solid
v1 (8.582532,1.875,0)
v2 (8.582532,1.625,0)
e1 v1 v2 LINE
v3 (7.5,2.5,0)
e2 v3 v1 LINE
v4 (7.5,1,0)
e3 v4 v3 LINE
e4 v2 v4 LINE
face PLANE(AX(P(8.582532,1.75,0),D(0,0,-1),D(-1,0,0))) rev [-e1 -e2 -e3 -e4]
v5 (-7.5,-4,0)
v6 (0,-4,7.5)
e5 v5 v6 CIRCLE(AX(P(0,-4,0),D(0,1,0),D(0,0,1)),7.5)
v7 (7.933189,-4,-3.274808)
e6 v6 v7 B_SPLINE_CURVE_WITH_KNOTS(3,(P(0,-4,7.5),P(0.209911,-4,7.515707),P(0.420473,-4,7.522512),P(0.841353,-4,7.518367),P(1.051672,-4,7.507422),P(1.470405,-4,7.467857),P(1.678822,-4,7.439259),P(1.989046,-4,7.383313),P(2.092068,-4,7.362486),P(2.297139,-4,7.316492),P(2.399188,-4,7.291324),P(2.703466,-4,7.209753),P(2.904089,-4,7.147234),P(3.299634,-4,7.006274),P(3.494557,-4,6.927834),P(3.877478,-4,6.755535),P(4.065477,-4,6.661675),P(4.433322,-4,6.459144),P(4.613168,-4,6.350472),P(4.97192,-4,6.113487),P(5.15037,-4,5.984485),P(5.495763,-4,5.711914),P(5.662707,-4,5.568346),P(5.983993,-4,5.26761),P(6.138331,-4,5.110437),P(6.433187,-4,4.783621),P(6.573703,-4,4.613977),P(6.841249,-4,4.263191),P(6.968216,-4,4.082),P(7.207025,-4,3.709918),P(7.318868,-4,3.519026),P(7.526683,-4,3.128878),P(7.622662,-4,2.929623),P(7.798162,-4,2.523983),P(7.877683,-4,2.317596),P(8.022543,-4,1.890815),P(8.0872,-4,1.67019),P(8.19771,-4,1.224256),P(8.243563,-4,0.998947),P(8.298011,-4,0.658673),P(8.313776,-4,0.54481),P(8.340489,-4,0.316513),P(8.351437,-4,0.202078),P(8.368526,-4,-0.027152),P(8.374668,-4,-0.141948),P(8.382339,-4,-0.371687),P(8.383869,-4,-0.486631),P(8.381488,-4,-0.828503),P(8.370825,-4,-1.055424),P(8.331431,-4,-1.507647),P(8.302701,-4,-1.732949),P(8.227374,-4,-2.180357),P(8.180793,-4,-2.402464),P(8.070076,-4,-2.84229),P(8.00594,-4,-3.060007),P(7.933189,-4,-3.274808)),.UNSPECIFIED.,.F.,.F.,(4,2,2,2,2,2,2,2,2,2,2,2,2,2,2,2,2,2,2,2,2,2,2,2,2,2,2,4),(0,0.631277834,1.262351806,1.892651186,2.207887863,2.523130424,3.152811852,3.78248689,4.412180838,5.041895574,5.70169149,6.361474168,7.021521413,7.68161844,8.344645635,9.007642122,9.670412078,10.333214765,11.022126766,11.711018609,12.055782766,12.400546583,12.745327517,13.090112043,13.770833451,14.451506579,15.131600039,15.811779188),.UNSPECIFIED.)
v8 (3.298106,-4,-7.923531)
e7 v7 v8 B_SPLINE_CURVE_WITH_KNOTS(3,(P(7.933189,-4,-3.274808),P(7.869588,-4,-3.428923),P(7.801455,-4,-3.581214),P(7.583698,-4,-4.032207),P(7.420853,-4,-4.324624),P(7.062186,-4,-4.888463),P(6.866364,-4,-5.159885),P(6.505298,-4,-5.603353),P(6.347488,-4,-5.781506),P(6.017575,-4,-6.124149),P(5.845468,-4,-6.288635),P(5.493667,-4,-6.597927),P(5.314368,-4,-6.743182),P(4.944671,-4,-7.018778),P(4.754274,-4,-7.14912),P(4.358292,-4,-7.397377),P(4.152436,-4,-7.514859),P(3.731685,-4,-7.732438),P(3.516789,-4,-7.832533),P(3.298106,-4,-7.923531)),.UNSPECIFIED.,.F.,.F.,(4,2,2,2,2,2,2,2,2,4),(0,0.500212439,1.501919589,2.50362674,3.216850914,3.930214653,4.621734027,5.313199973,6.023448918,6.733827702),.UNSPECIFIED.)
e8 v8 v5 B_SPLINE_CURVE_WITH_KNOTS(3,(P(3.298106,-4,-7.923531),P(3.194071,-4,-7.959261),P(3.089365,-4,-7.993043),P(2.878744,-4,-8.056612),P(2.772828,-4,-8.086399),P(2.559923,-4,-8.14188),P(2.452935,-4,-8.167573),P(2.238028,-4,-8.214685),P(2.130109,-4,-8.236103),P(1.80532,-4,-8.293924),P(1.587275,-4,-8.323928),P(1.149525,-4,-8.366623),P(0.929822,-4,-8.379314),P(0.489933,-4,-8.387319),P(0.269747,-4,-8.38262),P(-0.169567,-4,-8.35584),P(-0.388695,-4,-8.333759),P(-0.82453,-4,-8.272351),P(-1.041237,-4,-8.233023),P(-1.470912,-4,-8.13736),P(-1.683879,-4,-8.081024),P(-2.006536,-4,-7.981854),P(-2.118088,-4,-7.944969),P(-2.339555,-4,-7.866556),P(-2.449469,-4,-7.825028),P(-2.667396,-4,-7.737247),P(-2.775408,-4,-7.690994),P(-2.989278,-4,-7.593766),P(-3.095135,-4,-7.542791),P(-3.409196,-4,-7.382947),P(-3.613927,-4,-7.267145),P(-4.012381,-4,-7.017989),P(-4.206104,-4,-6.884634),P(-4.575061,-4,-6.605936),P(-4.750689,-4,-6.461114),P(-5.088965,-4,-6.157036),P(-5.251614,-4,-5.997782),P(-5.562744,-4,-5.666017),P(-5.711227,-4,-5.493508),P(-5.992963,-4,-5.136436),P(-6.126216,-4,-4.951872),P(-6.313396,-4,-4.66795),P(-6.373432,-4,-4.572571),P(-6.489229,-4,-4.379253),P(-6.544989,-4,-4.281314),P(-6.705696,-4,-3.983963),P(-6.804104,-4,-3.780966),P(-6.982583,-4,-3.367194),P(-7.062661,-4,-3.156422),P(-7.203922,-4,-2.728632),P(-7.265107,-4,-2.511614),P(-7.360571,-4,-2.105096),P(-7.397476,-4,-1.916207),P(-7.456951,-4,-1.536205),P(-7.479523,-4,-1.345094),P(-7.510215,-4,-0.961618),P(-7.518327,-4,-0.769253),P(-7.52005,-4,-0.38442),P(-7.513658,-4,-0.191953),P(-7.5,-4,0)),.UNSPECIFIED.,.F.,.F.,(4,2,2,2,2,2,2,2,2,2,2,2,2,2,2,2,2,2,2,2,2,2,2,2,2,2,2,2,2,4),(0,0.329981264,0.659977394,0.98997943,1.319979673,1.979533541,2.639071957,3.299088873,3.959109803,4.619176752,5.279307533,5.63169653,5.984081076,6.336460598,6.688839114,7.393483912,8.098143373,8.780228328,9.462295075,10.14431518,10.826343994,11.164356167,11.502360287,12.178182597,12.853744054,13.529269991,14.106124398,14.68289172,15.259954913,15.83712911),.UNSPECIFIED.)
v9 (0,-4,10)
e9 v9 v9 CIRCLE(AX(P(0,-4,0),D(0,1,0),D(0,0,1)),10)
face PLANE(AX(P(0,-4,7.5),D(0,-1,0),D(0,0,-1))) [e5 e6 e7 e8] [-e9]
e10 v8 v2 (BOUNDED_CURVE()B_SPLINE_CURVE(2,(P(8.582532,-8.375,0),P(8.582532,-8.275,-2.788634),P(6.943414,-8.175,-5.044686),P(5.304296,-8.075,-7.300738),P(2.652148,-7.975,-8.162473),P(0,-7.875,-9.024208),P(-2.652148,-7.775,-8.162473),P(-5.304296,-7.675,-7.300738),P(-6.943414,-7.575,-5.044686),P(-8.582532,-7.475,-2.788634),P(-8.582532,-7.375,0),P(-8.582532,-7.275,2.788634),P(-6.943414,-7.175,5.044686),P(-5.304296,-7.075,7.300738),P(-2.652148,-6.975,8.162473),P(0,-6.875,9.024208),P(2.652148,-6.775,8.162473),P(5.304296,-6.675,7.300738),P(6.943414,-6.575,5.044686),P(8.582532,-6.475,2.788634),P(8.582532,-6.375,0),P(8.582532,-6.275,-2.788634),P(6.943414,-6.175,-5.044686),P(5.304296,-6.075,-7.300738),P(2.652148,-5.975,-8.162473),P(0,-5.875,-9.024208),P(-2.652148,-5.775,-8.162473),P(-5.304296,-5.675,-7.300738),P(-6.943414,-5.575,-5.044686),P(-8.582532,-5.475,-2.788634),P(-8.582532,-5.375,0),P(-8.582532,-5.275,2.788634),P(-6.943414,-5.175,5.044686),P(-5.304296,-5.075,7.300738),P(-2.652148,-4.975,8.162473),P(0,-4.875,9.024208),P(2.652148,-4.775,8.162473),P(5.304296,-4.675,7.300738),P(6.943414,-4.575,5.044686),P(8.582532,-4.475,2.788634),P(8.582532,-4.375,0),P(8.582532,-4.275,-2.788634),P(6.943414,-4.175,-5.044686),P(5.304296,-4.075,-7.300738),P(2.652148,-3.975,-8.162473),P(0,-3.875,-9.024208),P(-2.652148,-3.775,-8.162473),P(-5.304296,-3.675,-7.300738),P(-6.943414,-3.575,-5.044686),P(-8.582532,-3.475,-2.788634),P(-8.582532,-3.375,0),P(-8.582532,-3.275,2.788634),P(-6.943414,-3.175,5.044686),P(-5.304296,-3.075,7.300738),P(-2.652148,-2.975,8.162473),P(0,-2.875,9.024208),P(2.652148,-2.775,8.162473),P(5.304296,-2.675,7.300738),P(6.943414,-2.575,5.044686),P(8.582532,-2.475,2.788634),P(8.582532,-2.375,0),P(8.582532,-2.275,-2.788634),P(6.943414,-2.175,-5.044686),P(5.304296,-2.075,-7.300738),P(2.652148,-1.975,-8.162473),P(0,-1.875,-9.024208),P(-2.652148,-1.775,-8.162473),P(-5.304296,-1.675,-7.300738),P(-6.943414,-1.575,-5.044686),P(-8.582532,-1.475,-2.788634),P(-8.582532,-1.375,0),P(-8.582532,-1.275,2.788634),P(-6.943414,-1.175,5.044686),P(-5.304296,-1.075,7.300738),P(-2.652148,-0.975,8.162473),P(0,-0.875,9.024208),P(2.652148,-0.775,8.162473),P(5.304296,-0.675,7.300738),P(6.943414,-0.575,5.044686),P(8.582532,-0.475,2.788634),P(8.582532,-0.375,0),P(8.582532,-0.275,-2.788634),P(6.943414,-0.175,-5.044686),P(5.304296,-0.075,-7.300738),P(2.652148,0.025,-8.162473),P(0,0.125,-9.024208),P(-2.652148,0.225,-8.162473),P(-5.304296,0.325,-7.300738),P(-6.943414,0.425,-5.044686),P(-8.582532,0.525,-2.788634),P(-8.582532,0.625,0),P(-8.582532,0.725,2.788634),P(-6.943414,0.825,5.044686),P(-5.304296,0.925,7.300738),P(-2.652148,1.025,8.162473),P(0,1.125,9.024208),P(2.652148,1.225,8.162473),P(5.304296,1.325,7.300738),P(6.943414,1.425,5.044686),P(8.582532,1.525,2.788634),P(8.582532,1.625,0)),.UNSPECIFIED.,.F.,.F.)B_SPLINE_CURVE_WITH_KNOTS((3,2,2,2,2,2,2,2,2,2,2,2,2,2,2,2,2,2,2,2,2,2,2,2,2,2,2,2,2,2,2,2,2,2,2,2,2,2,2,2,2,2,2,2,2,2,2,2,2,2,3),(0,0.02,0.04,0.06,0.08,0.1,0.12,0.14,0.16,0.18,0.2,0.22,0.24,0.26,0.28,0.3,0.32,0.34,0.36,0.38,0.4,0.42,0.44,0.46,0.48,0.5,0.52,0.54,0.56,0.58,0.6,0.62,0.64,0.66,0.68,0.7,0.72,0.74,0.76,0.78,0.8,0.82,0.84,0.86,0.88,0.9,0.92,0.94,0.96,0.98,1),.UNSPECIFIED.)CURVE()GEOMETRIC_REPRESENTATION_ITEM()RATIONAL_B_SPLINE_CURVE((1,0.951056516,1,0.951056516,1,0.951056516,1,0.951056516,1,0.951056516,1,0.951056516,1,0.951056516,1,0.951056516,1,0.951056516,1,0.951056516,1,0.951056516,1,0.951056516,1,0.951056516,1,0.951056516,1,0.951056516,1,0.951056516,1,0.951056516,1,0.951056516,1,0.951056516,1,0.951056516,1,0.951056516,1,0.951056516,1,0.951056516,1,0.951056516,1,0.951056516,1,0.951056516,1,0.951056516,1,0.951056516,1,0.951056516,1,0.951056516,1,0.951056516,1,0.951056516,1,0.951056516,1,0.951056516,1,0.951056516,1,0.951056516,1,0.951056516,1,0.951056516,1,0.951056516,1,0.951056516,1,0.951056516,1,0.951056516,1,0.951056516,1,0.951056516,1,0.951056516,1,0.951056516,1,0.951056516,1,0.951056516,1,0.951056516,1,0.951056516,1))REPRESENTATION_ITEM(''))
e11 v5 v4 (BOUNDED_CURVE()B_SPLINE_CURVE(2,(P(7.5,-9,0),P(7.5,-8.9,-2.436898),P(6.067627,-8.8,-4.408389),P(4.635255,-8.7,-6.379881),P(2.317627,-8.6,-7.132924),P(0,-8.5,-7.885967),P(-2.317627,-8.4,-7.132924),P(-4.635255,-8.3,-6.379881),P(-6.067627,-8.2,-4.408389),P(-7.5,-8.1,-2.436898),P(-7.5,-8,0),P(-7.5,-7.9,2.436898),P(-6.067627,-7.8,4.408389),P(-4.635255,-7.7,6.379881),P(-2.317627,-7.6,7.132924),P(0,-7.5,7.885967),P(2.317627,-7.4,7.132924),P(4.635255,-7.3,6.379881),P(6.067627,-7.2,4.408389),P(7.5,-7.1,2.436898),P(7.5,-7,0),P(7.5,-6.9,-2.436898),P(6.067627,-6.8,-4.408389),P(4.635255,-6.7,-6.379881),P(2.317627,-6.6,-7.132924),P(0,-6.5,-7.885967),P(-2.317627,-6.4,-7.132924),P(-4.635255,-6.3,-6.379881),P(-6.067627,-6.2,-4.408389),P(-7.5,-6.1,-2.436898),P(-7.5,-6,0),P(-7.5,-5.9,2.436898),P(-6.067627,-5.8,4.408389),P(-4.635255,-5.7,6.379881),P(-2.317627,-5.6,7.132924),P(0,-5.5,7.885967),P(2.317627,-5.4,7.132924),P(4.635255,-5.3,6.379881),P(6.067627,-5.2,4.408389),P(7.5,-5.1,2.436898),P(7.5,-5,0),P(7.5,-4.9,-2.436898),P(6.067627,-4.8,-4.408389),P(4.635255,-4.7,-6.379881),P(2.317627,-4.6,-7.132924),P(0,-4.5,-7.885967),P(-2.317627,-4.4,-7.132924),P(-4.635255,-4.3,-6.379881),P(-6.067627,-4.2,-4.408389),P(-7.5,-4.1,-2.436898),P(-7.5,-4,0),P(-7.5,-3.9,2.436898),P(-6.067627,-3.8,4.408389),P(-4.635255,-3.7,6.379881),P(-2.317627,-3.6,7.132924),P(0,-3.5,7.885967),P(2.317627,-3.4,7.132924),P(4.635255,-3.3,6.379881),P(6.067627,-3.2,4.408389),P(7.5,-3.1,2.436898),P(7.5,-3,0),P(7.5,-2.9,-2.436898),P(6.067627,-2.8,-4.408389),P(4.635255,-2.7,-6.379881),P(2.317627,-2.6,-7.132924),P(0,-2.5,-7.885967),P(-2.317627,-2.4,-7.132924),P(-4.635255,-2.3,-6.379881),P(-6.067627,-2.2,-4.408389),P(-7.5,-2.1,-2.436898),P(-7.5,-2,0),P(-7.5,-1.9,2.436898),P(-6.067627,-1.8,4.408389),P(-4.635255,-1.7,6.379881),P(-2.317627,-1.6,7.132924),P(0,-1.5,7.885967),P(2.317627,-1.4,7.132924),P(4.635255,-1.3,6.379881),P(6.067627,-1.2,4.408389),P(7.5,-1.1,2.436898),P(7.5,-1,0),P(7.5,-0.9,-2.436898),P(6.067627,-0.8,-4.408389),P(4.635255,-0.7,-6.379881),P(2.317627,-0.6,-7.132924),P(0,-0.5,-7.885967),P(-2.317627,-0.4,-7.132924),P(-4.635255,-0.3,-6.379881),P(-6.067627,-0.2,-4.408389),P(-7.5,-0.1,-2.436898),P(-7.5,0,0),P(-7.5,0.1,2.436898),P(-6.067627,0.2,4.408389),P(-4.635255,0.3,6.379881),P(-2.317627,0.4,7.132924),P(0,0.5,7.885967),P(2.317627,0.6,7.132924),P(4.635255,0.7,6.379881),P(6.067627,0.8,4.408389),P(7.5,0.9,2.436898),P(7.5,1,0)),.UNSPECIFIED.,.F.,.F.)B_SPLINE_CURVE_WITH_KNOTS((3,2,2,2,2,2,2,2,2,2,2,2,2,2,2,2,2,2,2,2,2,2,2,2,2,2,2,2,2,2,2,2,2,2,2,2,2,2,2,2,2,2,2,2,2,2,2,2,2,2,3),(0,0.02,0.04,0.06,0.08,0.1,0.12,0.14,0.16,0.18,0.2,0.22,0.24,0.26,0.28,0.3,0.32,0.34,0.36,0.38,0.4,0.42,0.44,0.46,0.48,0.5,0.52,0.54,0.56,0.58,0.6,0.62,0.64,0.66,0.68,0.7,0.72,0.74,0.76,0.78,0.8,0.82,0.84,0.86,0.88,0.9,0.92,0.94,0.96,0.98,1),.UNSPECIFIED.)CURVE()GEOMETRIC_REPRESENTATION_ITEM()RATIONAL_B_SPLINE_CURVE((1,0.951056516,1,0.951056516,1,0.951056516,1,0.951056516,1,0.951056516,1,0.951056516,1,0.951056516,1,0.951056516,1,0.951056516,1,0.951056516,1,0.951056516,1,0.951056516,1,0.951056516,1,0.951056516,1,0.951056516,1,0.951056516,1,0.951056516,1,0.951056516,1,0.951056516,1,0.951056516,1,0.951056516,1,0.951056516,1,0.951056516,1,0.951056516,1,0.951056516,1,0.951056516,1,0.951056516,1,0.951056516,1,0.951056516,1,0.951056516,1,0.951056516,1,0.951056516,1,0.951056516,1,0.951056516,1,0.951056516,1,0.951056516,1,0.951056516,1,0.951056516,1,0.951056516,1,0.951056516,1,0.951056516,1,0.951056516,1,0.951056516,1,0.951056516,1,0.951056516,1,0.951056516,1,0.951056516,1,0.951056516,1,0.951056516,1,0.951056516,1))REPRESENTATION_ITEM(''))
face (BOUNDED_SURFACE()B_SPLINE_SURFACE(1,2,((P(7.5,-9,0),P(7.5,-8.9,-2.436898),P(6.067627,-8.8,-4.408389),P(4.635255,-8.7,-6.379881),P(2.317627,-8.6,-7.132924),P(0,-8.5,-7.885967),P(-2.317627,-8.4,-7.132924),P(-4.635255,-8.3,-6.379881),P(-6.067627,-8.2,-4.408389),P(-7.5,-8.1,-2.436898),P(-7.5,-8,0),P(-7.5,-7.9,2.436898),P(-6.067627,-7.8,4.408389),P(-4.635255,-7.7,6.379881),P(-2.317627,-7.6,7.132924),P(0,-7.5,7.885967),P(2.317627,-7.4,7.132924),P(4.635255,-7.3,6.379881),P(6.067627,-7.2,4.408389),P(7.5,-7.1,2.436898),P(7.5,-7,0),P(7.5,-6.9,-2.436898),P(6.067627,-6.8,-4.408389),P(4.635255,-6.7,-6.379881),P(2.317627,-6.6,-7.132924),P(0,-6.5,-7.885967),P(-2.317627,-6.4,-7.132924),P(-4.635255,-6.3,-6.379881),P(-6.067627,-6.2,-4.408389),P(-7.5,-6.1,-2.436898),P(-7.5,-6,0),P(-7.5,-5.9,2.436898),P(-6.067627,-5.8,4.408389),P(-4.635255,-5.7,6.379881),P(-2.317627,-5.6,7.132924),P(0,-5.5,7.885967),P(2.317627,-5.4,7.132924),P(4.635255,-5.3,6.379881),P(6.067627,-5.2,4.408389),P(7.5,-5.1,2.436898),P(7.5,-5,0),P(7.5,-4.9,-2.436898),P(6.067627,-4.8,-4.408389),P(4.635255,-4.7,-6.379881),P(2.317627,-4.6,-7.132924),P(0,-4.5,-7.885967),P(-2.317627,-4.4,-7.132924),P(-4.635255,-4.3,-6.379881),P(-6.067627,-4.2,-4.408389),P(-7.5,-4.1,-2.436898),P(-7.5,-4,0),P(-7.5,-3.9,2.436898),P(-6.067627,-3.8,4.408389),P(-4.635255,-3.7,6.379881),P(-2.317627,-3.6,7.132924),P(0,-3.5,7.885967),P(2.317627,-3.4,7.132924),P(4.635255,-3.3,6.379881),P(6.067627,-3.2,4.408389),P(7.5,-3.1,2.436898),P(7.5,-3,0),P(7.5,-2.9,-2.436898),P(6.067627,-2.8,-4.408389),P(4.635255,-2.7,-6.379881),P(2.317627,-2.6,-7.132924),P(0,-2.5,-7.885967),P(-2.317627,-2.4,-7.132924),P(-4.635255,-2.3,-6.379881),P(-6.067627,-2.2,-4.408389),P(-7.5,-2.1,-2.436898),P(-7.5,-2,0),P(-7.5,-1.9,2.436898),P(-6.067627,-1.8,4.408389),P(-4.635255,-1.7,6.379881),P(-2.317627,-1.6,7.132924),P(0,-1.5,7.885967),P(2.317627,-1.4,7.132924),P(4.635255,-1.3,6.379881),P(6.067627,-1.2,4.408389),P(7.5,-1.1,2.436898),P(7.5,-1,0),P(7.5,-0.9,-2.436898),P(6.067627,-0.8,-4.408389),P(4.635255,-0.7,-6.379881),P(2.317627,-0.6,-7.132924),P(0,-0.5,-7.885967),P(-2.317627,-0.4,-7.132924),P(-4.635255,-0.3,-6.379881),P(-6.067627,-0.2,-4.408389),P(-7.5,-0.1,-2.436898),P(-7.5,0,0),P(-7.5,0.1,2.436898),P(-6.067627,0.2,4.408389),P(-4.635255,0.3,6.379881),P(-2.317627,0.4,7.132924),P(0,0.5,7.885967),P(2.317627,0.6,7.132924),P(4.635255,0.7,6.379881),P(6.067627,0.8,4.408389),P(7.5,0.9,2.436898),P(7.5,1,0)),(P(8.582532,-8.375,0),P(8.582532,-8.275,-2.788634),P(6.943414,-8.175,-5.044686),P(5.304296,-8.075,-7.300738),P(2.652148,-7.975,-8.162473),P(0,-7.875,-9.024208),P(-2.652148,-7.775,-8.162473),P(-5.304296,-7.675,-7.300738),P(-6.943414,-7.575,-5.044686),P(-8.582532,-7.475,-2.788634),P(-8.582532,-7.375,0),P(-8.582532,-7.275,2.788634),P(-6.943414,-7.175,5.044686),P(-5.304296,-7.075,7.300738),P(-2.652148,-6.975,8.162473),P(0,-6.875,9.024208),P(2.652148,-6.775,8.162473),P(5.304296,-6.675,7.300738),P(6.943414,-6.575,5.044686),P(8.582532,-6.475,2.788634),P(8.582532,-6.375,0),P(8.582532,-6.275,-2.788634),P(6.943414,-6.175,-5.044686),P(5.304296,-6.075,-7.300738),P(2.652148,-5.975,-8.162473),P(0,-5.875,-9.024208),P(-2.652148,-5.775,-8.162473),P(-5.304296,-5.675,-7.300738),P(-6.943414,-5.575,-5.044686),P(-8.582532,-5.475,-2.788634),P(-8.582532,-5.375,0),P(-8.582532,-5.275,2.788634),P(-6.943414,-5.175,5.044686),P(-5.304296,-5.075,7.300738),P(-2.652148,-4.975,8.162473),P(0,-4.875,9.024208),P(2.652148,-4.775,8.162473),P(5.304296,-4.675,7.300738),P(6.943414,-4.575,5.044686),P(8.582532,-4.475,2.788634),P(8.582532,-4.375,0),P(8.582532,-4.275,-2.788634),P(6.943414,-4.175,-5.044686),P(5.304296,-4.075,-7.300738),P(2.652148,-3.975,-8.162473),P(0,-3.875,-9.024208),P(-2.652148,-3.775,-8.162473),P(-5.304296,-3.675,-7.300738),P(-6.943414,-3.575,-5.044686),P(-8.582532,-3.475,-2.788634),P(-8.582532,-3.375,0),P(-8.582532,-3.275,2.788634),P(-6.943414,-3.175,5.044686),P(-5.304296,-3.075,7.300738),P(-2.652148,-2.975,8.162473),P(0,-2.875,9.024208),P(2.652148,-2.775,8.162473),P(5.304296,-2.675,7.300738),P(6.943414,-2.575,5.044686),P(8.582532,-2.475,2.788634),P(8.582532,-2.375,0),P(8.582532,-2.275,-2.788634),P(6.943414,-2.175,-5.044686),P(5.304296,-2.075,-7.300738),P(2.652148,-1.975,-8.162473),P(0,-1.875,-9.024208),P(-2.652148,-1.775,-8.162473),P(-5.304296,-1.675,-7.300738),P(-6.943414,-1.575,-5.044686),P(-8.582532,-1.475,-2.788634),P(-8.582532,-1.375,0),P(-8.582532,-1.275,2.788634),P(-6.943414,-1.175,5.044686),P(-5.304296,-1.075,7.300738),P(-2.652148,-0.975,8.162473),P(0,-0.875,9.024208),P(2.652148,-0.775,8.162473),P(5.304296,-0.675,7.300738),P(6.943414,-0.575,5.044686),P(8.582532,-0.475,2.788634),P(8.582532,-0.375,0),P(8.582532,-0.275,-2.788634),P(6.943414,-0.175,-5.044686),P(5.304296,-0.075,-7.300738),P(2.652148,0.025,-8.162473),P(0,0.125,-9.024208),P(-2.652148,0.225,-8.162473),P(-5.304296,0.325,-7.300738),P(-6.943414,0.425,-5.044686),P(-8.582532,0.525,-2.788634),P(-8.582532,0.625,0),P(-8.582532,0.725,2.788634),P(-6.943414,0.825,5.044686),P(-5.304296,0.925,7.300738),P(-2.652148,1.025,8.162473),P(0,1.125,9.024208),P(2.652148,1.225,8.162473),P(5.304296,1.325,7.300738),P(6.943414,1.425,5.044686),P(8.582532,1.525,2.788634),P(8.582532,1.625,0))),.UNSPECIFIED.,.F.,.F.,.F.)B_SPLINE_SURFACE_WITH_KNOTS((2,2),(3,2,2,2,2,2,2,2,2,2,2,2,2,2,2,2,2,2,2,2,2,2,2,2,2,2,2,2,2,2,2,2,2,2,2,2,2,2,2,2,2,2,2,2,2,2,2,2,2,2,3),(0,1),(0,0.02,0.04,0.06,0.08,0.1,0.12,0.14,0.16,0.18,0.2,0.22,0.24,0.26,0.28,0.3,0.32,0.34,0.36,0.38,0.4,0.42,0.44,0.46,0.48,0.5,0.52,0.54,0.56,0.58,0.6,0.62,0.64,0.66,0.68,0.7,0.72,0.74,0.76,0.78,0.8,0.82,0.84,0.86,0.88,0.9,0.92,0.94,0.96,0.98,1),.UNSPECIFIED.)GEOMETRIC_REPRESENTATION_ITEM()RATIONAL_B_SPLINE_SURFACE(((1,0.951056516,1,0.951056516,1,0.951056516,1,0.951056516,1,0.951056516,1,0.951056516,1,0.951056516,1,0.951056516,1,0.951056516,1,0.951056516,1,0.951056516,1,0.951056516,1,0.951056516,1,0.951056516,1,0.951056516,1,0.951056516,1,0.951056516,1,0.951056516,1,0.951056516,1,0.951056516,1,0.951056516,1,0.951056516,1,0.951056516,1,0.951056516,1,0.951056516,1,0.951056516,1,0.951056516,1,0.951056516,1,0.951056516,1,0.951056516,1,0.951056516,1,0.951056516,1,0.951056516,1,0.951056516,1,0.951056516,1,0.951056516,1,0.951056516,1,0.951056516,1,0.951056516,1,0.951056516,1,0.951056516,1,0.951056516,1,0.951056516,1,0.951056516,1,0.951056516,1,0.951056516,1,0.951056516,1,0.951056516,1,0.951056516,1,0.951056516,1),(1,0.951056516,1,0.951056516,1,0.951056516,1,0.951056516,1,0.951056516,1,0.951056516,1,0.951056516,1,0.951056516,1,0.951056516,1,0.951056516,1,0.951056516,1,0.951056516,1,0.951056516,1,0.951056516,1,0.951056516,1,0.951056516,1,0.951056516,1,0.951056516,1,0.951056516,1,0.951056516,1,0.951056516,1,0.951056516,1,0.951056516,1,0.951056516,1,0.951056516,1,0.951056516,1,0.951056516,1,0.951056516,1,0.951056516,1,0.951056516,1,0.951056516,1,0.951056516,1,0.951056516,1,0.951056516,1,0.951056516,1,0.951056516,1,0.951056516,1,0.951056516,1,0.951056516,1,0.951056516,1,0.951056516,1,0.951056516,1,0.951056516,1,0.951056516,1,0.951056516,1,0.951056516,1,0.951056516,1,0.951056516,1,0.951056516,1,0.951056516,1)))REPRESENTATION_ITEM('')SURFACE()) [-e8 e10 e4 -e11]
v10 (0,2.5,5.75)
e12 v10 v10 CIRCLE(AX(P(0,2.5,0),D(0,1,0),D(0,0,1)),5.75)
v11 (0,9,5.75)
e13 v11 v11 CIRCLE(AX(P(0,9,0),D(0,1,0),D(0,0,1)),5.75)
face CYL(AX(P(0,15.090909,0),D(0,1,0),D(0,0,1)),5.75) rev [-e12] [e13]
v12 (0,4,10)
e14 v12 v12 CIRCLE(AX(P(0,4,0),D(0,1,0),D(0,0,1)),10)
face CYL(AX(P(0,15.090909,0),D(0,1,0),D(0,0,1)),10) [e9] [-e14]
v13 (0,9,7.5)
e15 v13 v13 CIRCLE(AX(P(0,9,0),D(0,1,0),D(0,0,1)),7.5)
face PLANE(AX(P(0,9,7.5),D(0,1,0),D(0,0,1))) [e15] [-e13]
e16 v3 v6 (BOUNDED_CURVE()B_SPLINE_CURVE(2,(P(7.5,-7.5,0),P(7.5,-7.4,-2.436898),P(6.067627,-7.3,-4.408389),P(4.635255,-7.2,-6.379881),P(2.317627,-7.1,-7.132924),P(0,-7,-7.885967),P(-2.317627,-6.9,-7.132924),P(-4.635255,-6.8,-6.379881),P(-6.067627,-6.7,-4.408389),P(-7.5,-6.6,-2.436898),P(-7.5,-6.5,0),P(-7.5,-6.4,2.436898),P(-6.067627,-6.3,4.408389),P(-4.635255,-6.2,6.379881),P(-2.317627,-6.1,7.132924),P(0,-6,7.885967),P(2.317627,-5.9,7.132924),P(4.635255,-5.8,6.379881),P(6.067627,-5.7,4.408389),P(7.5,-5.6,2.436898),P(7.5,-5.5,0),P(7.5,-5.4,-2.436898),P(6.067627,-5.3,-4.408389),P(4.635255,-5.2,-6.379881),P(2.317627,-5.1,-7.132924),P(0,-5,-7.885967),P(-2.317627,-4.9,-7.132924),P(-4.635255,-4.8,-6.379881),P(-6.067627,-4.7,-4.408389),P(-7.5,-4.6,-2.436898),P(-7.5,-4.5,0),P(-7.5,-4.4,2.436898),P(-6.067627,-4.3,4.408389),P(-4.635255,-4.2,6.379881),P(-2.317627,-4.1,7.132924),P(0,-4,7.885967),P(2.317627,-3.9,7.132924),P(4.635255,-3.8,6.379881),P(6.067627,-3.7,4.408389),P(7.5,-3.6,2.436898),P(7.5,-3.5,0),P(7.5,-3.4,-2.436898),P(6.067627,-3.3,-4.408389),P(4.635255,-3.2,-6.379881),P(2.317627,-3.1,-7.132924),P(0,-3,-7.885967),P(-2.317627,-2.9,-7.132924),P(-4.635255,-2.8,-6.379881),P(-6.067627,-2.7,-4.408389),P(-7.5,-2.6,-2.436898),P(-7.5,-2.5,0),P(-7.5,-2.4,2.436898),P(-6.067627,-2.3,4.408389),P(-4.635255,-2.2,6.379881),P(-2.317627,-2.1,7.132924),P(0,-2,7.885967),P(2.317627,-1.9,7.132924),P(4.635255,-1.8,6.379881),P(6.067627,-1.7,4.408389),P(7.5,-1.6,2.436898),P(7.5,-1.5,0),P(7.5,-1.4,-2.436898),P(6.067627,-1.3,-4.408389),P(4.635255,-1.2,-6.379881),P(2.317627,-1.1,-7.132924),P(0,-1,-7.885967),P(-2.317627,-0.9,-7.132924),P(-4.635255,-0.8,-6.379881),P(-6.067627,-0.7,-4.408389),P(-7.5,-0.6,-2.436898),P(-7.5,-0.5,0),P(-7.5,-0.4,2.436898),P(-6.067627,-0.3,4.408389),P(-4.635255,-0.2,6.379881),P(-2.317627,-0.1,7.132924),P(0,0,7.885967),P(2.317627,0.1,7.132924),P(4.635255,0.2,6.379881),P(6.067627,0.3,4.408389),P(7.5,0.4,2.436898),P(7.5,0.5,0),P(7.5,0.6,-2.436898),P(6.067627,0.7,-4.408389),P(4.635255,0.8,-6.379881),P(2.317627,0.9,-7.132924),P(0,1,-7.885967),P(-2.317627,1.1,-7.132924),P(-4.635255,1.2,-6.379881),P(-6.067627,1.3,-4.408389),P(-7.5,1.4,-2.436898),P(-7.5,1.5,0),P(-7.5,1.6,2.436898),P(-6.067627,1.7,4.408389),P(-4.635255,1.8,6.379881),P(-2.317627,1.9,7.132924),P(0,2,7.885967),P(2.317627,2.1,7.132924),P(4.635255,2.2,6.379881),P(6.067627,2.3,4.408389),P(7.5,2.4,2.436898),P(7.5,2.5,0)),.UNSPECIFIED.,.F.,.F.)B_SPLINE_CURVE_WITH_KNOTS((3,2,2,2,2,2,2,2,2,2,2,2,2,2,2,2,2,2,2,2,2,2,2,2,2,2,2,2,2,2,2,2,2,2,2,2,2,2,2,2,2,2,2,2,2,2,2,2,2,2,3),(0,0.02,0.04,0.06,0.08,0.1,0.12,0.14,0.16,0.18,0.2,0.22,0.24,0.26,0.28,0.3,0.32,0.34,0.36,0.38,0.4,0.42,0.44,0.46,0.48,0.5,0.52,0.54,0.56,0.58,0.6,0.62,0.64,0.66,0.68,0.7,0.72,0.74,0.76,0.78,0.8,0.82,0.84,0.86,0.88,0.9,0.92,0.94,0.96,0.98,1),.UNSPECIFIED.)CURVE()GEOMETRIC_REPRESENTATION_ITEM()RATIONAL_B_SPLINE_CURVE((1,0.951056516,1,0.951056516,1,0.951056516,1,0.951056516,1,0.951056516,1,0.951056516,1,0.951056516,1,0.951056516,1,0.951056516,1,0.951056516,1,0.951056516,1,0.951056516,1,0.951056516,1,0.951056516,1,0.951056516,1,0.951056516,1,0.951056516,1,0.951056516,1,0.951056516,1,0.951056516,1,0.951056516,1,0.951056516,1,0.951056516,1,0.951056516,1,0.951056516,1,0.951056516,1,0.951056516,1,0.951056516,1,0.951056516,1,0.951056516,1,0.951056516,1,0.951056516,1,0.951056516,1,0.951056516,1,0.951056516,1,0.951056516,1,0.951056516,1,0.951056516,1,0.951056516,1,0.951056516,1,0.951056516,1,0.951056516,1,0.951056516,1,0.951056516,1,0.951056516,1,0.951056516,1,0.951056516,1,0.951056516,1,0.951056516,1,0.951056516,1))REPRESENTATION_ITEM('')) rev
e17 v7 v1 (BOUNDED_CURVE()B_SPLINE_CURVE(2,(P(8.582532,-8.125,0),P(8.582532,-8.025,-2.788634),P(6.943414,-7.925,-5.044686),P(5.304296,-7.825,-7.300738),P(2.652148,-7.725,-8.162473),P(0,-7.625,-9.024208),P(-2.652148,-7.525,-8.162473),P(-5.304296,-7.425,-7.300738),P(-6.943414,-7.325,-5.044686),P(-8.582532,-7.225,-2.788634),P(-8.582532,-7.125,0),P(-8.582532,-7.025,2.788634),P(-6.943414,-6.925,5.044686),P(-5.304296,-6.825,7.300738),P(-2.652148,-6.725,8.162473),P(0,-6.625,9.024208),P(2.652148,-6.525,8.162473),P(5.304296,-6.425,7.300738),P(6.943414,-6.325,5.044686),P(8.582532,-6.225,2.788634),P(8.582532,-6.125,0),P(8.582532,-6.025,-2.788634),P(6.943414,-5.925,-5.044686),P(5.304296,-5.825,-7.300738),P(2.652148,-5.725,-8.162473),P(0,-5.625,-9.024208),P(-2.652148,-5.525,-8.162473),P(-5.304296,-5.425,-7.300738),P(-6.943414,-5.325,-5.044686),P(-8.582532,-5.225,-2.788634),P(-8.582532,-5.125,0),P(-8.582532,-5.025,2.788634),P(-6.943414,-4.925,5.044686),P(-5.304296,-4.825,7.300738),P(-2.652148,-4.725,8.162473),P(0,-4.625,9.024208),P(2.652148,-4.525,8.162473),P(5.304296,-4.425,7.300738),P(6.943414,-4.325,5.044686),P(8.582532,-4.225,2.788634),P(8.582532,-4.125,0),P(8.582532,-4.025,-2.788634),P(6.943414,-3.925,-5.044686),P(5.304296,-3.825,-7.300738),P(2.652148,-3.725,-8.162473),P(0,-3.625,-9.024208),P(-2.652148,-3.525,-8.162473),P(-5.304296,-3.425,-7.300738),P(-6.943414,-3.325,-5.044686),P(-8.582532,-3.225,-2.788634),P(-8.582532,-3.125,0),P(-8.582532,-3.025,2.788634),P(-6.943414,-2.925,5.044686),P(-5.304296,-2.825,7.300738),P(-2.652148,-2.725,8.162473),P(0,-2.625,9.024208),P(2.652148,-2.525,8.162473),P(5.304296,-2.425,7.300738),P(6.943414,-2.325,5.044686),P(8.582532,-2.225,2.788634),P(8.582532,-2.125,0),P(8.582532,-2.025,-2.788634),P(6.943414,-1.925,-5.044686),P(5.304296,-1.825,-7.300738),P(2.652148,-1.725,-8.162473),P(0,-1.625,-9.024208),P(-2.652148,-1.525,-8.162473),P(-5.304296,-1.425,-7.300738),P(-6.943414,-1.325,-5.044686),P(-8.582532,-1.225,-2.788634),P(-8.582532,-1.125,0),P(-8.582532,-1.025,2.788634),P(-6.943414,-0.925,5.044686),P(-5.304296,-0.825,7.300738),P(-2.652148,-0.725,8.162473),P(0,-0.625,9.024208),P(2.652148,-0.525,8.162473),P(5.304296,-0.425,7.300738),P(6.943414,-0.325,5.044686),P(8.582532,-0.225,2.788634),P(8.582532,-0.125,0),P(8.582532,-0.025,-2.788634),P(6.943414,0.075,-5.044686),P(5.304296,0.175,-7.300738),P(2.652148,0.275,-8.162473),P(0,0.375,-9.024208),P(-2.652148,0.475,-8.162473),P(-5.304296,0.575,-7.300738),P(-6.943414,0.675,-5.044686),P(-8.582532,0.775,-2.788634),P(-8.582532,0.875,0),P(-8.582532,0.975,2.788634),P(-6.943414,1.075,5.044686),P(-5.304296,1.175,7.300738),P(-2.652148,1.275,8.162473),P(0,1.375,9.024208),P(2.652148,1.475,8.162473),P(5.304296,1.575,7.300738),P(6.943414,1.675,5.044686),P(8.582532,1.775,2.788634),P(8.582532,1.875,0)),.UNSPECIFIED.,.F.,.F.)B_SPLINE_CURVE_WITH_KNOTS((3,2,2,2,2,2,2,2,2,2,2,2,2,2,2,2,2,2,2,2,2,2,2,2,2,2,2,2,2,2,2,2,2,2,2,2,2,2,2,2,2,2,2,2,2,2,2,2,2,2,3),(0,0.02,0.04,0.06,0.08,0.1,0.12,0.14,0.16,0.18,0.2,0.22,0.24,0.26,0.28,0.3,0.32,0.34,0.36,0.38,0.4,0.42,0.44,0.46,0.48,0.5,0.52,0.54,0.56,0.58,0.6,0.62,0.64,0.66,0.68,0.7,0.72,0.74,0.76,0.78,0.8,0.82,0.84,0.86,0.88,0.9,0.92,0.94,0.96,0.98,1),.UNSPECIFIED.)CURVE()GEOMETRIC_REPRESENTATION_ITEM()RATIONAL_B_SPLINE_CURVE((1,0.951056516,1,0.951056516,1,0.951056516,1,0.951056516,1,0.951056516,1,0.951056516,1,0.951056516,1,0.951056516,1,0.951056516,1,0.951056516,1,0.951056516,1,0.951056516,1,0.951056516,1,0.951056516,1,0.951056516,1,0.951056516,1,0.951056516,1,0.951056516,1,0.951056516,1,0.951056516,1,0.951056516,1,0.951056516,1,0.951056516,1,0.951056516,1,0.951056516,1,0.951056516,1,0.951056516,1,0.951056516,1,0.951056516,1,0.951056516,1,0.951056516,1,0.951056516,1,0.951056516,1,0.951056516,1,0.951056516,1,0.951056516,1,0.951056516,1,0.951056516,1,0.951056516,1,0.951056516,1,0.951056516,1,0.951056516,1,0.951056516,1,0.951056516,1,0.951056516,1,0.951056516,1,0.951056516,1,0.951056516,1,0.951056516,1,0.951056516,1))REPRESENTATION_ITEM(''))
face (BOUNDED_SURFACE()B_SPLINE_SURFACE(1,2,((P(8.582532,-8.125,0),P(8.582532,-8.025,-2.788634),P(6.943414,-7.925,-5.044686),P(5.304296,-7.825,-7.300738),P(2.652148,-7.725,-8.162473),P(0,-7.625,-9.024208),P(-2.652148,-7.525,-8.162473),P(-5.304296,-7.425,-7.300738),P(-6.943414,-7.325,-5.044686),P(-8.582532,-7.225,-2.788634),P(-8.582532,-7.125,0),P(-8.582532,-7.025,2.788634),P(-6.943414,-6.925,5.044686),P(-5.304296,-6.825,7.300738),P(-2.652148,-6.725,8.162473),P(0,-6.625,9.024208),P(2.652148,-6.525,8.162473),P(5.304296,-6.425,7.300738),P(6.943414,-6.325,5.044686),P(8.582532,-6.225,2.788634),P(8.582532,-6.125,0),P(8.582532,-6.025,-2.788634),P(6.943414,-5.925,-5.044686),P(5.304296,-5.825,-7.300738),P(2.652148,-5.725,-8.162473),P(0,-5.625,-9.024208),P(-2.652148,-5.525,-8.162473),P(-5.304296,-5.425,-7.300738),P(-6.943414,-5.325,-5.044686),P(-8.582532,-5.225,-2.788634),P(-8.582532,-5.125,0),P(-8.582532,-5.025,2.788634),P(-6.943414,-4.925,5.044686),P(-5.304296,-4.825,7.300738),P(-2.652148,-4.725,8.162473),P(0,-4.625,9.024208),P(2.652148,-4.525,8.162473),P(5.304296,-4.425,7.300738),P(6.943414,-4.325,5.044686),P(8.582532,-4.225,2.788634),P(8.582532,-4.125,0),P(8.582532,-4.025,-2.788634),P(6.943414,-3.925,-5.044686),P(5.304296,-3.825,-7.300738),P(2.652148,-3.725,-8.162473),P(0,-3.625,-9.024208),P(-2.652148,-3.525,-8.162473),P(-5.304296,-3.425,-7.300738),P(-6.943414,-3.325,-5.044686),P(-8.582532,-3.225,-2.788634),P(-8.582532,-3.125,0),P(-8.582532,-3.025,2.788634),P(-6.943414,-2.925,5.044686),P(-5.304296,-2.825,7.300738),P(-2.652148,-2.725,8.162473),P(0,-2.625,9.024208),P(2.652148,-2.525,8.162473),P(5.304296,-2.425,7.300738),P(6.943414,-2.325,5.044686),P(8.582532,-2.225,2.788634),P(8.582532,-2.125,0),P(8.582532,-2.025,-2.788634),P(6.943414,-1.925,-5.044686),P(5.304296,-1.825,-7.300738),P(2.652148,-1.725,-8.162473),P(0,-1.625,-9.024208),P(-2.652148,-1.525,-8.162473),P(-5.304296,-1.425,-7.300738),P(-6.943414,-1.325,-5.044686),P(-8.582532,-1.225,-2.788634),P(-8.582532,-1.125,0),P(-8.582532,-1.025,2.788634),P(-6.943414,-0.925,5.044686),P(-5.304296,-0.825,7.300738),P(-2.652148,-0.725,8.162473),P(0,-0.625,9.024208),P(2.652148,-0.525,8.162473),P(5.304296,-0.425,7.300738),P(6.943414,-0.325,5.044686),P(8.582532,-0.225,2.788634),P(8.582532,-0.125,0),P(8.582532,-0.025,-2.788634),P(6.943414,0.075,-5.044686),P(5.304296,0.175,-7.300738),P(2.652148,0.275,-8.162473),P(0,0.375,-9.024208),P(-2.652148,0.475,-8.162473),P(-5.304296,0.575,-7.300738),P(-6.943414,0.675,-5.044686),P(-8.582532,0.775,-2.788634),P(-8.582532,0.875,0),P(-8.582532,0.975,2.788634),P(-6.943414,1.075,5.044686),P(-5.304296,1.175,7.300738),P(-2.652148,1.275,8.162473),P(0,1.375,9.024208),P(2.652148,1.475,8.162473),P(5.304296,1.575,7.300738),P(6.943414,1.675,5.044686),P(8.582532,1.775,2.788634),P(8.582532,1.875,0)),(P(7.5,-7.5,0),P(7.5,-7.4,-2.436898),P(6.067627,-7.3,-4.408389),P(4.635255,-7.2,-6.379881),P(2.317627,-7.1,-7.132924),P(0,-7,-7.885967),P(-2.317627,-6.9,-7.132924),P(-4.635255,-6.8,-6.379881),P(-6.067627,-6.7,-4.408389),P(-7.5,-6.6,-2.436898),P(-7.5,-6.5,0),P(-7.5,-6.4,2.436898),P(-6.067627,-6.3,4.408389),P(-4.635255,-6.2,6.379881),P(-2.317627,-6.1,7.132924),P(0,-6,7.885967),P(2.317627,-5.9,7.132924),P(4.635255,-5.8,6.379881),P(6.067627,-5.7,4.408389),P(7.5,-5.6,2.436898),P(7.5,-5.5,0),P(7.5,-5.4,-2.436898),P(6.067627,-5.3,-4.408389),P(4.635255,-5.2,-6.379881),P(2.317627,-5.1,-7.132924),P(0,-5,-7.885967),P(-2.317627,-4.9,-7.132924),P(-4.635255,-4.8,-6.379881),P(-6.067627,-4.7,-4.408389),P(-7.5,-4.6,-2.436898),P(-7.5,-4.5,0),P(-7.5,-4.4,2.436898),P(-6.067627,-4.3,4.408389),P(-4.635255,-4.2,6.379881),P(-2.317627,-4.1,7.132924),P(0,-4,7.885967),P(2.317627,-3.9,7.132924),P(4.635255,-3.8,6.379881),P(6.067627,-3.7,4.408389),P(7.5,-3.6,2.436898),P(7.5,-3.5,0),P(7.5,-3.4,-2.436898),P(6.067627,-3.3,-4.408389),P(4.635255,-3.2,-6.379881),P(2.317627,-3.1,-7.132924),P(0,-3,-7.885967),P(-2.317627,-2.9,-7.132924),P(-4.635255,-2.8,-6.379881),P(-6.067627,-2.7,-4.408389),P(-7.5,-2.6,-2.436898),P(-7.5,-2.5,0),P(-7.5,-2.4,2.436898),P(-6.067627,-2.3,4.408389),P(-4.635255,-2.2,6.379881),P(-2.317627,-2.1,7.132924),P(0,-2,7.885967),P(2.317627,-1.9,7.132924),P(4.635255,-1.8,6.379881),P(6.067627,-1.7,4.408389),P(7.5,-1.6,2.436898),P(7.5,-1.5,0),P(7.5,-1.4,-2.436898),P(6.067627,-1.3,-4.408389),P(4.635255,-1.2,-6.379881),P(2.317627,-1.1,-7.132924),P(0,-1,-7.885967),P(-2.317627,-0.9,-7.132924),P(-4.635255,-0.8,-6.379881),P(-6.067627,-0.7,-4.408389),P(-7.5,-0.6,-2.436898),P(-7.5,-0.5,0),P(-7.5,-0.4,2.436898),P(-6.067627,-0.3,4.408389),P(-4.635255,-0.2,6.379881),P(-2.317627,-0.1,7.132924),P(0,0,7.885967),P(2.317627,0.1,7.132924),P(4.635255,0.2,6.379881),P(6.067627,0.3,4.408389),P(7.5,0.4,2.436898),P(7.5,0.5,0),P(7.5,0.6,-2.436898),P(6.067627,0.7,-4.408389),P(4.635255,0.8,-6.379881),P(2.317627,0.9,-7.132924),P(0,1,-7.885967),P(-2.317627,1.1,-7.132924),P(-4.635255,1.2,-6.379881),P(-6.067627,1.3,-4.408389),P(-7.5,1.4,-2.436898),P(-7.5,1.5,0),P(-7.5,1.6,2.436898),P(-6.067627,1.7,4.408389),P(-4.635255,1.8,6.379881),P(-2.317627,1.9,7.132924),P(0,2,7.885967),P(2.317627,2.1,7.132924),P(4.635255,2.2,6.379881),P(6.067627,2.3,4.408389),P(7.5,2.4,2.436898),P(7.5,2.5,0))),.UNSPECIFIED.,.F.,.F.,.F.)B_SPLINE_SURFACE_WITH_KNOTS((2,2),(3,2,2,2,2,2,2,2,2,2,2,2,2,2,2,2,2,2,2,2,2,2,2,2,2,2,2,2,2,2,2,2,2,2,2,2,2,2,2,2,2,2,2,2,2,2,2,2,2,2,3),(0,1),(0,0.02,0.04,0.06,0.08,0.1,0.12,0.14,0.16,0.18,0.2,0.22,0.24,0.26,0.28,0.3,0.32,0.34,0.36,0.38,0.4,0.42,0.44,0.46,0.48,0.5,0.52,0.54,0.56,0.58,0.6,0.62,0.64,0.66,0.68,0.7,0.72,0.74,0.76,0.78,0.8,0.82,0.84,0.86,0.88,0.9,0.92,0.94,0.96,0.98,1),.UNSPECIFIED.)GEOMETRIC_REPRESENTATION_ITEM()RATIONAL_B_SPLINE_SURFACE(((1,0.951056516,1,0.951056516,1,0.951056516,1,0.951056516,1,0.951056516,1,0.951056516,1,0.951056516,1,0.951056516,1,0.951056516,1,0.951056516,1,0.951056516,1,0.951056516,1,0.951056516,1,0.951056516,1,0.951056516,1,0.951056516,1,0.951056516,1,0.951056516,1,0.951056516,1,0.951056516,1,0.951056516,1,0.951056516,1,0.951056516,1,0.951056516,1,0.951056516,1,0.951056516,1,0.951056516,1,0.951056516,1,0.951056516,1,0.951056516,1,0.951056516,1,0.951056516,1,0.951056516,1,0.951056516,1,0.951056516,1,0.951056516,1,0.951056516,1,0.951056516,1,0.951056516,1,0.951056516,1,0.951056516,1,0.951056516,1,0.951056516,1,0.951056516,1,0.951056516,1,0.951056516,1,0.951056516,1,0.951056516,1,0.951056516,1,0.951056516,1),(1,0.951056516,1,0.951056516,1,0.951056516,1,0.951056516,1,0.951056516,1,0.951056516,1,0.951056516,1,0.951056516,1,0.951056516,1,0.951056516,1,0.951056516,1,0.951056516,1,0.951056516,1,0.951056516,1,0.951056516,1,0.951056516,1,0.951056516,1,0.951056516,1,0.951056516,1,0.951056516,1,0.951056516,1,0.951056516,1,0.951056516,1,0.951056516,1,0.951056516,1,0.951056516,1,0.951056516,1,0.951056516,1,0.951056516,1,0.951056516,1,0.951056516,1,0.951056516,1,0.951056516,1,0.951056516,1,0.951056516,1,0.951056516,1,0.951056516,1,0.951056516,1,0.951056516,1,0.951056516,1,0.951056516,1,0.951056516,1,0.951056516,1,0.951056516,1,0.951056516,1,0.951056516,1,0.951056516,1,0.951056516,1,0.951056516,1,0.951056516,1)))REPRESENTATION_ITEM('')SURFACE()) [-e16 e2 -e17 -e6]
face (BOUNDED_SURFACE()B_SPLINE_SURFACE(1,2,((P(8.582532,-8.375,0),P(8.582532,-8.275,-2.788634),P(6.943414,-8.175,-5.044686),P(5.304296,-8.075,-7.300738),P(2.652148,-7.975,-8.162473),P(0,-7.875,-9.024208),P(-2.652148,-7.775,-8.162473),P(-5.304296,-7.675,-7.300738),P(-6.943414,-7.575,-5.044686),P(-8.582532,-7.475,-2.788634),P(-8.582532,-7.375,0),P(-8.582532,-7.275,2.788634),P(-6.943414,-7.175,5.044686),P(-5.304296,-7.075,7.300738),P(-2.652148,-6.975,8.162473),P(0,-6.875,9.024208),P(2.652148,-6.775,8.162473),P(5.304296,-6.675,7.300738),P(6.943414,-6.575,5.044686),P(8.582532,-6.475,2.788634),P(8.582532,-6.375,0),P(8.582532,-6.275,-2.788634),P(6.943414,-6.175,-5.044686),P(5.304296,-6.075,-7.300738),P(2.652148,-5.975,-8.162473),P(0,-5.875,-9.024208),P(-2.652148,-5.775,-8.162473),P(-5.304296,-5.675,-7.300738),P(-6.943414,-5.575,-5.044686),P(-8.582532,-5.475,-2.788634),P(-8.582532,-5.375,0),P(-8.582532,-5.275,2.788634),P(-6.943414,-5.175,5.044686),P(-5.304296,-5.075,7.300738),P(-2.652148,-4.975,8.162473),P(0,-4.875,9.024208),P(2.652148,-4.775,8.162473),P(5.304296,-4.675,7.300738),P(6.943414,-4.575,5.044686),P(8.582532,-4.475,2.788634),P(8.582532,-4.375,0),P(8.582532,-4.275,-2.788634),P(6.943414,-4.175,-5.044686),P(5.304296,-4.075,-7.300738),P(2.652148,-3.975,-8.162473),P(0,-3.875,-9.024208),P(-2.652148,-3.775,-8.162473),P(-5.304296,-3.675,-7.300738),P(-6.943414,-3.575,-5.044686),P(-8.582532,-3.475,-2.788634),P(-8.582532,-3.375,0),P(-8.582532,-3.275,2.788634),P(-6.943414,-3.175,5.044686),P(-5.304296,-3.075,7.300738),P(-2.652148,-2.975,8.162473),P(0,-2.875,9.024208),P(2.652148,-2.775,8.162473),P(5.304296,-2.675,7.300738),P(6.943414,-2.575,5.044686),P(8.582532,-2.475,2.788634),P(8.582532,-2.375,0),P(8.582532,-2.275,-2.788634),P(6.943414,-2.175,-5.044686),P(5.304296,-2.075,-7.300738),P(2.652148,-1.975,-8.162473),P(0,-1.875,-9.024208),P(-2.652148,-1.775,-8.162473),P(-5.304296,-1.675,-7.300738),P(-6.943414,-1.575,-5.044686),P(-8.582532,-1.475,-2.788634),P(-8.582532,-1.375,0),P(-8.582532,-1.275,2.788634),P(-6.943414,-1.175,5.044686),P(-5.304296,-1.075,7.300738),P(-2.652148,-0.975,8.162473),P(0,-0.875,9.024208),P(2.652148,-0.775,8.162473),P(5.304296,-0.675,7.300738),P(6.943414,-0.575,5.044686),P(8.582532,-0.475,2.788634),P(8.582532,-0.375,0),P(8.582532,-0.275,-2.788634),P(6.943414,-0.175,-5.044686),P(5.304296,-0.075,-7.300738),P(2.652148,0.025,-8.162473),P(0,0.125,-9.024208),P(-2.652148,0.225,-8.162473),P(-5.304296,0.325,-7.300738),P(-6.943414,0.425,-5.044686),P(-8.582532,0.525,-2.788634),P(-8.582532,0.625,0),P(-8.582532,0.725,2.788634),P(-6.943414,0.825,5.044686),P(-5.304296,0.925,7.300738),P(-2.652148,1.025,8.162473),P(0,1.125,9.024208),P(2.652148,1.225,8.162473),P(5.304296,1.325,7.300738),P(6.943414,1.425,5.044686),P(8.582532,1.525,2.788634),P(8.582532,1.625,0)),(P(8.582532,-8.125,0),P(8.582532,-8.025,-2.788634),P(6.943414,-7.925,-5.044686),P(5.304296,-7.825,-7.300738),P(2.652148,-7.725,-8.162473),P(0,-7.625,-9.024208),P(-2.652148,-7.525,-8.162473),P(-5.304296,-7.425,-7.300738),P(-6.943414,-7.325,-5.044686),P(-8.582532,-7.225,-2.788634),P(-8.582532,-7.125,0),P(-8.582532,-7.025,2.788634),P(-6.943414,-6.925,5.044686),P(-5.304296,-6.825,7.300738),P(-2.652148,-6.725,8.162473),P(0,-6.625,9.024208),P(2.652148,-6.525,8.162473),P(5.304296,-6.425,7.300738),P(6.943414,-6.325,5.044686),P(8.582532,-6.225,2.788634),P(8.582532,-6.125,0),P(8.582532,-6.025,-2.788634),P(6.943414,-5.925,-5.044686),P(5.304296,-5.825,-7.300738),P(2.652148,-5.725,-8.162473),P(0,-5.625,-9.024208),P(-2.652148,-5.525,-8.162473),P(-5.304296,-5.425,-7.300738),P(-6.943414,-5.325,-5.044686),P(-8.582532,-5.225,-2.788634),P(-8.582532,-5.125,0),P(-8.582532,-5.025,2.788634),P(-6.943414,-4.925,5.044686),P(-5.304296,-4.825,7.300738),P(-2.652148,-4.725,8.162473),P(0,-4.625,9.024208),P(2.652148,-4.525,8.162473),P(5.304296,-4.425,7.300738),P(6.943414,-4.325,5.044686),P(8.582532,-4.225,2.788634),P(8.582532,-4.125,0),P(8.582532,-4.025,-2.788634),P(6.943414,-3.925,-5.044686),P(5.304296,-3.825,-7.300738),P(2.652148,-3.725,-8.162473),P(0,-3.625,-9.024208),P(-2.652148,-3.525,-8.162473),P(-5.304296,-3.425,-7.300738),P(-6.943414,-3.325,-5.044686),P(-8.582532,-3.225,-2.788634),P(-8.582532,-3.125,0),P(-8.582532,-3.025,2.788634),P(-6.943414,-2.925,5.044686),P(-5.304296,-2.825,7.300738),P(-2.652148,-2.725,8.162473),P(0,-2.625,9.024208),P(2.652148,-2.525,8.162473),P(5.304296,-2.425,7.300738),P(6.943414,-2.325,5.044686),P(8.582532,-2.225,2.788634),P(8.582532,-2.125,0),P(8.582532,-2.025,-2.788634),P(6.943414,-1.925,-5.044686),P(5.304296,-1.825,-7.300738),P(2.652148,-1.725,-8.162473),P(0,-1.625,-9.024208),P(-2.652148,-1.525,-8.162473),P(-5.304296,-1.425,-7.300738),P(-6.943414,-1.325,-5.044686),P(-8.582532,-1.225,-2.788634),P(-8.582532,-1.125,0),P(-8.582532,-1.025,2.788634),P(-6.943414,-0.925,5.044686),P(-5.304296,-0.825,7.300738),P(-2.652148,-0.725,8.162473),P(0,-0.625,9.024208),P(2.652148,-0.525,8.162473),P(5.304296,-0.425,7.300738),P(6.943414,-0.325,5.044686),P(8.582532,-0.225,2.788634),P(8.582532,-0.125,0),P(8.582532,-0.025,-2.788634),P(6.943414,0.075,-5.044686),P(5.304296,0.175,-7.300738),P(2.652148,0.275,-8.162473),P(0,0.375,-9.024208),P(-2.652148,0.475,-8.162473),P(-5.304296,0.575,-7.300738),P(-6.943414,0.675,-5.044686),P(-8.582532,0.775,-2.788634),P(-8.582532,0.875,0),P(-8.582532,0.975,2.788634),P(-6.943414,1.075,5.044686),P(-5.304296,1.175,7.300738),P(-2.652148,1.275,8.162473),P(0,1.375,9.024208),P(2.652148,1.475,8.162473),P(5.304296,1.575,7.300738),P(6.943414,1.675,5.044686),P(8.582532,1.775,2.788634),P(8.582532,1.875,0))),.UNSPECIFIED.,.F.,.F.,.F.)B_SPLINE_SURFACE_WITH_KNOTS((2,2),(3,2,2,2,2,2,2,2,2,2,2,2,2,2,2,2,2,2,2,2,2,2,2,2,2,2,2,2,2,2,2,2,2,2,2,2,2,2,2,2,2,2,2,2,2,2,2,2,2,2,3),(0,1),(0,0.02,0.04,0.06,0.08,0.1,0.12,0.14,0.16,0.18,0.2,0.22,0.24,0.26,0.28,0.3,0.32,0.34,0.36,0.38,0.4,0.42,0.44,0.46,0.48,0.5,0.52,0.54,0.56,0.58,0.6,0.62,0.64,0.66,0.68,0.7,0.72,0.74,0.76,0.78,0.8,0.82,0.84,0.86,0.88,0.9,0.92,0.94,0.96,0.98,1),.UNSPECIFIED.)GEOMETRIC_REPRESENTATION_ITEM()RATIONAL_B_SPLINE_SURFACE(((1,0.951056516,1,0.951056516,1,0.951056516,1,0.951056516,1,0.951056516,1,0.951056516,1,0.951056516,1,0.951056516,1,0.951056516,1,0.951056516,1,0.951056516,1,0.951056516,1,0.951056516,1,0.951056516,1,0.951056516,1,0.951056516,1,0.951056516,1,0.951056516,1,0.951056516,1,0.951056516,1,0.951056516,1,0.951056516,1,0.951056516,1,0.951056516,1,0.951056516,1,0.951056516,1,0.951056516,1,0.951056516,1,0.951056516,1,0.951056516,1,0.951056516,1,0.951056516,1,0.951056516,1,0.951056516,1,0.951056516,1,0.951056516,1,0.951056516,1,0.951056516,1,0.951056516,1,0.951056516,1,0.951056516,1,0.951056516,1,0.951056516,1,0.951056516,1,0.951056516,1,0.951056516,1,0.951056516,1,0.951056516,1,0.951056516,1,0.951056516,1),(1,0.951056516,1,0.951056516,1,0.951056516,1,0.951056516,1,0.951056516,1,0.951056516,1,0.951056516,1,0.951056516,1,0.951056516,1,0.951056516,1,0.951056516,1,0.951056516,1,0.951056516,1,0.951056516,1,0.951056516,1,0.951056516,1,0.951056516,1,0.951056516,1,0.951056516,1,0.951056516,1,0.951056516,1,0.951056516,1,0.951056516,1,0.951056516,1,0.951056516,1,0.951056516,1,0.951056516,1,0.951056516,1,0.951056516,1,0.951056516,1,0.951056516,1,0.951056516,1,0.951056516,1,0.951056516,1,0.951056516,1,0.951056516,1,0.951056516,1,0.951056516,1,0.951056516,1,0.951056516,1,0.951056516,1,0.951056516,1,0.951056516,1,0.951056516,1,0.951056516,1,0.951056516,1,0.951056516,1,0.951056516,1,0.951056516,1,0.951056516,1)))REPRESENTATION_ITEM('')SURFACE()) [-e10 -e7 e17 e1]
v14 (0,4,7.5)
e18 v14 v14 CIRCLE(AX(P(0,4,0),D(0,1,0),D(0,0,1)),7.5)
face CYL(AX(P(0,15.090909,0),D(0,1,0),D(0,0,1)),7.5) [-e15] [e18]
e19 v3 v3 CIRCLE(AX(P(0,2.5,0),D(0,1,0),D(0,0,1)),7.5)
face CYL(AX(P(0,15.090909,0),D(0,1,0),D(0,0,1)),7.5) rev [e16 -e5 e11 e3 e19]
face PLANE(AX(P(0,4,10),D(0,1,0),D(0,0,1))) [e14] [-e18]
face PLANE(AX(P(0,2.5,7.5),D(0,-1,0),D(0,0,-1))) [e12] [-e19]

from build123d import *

# Parameters (mm, degrees)
THREAD1_PITCH = 2


with BuildPart() as part:
    # Sketch1 → Revolve1 (revolve)
    with BuildSketch(Plane(origin=(0, 0, 0), x_dir=(0, 0, -1), z_dir=(1, 0, 0))):
        Polygon((-7.5, 2.5), (-7.5, -4), (-10, -4), (-10, 4), (-7.5, 4), (-7.5, 9), (-5.75, 9), (-5.75, 2.5), align=None)
    revolve(axis=Axis((0, 15.090909091, 0), (0, -1, 0)))

    # Thread1: the profile of Thread Profile1 profile screwed along a right-hand helix of 5 turns, 10 arcs to a turn; built about Z, then put on its axis
    thread1_z = Axis((0, 0, 0), (0, 0, 1))
    thread1_corners = [(7.4997, 0, -0.000173205), (8.58253175, 0, 0.624999997), (8.58253175, 0, 0.874999997), (7.4997, 0, 1.5001732)]
    with BuildLine(mode=Mode.PRIVATE) as thread1_profile:
        Line(thread1_corners[0], thread1_corners[1])
        Line(thread1_corners[1], thread1_corners[2])
        Line(thread1_corners[2], thread1_corners[3])
        Line(thread1_corners[3], thread1_corners[0])
    thread1_cap = Face(thread1_profile.wire())
    thread1_turn_angles = [0, 18, 36, 54, 72, 90, 108, 126, 144, 162, 180, 198, 216, 234, 252, 270, 288, 306, 324, 342, 360]
    thread1_turn_weights = [1, 0.9510565162951535, 1, 0.9510565162951535, 1, 0.9510565162951535, 1, 0.9510565162951535, 1, 0.9510565162951535, 1, 0.9510565162951535, 1, 0.9510565162951535, 1, 0.9510565162951535, 1, 0.9510565162951535, 1, 0.9510565162951535, 1]
    thread1_turn_rails = [Edge.make_bspline([Vector(p[0], p[1], 0).rotate(thread1_z, thread1_turn_angles[k]) / thread1_turn_weights[k] + Vector(0, 0, p[2] + THREAD1_PITCH * thread1_turn_angles[k] / 360) for k in range(21)], [0, 0, 0, 1, 1, 2, 2, 3, 3, 4, 4, 5, 5, 6, 6, 7, 7, 8, 8, 9, 9, 10, 10, 10], 2, thread1_turn_weights) for p in thread1_corners]
    thread1_turn_sides = [Face.make_surface_from_curves(thread1_turn_rails[p[0]], thread1_turn_rails[p[1]]) for p in [(0, 1), (1, 2), (2, 3), (3, 0)]]
    thread1 = Plane(origin=(0, -9, 0), x_dir=(1, 0, 0), z_dir=(0, 1, 0)) * Solid(Shell([*[p.moved(Location((0, 0, THREAD1_PITCH * i))) for i in range(5) for p in thread1_turn_sides], thread1_cap, thread1_cap.rotate(thread1_z, 1800).moved(Location((0, 0, THREAD1_PITCH * 1800 / 360)))]))
    add(thread1, mode=Mode.SUBTRACT)


solid = part.part
